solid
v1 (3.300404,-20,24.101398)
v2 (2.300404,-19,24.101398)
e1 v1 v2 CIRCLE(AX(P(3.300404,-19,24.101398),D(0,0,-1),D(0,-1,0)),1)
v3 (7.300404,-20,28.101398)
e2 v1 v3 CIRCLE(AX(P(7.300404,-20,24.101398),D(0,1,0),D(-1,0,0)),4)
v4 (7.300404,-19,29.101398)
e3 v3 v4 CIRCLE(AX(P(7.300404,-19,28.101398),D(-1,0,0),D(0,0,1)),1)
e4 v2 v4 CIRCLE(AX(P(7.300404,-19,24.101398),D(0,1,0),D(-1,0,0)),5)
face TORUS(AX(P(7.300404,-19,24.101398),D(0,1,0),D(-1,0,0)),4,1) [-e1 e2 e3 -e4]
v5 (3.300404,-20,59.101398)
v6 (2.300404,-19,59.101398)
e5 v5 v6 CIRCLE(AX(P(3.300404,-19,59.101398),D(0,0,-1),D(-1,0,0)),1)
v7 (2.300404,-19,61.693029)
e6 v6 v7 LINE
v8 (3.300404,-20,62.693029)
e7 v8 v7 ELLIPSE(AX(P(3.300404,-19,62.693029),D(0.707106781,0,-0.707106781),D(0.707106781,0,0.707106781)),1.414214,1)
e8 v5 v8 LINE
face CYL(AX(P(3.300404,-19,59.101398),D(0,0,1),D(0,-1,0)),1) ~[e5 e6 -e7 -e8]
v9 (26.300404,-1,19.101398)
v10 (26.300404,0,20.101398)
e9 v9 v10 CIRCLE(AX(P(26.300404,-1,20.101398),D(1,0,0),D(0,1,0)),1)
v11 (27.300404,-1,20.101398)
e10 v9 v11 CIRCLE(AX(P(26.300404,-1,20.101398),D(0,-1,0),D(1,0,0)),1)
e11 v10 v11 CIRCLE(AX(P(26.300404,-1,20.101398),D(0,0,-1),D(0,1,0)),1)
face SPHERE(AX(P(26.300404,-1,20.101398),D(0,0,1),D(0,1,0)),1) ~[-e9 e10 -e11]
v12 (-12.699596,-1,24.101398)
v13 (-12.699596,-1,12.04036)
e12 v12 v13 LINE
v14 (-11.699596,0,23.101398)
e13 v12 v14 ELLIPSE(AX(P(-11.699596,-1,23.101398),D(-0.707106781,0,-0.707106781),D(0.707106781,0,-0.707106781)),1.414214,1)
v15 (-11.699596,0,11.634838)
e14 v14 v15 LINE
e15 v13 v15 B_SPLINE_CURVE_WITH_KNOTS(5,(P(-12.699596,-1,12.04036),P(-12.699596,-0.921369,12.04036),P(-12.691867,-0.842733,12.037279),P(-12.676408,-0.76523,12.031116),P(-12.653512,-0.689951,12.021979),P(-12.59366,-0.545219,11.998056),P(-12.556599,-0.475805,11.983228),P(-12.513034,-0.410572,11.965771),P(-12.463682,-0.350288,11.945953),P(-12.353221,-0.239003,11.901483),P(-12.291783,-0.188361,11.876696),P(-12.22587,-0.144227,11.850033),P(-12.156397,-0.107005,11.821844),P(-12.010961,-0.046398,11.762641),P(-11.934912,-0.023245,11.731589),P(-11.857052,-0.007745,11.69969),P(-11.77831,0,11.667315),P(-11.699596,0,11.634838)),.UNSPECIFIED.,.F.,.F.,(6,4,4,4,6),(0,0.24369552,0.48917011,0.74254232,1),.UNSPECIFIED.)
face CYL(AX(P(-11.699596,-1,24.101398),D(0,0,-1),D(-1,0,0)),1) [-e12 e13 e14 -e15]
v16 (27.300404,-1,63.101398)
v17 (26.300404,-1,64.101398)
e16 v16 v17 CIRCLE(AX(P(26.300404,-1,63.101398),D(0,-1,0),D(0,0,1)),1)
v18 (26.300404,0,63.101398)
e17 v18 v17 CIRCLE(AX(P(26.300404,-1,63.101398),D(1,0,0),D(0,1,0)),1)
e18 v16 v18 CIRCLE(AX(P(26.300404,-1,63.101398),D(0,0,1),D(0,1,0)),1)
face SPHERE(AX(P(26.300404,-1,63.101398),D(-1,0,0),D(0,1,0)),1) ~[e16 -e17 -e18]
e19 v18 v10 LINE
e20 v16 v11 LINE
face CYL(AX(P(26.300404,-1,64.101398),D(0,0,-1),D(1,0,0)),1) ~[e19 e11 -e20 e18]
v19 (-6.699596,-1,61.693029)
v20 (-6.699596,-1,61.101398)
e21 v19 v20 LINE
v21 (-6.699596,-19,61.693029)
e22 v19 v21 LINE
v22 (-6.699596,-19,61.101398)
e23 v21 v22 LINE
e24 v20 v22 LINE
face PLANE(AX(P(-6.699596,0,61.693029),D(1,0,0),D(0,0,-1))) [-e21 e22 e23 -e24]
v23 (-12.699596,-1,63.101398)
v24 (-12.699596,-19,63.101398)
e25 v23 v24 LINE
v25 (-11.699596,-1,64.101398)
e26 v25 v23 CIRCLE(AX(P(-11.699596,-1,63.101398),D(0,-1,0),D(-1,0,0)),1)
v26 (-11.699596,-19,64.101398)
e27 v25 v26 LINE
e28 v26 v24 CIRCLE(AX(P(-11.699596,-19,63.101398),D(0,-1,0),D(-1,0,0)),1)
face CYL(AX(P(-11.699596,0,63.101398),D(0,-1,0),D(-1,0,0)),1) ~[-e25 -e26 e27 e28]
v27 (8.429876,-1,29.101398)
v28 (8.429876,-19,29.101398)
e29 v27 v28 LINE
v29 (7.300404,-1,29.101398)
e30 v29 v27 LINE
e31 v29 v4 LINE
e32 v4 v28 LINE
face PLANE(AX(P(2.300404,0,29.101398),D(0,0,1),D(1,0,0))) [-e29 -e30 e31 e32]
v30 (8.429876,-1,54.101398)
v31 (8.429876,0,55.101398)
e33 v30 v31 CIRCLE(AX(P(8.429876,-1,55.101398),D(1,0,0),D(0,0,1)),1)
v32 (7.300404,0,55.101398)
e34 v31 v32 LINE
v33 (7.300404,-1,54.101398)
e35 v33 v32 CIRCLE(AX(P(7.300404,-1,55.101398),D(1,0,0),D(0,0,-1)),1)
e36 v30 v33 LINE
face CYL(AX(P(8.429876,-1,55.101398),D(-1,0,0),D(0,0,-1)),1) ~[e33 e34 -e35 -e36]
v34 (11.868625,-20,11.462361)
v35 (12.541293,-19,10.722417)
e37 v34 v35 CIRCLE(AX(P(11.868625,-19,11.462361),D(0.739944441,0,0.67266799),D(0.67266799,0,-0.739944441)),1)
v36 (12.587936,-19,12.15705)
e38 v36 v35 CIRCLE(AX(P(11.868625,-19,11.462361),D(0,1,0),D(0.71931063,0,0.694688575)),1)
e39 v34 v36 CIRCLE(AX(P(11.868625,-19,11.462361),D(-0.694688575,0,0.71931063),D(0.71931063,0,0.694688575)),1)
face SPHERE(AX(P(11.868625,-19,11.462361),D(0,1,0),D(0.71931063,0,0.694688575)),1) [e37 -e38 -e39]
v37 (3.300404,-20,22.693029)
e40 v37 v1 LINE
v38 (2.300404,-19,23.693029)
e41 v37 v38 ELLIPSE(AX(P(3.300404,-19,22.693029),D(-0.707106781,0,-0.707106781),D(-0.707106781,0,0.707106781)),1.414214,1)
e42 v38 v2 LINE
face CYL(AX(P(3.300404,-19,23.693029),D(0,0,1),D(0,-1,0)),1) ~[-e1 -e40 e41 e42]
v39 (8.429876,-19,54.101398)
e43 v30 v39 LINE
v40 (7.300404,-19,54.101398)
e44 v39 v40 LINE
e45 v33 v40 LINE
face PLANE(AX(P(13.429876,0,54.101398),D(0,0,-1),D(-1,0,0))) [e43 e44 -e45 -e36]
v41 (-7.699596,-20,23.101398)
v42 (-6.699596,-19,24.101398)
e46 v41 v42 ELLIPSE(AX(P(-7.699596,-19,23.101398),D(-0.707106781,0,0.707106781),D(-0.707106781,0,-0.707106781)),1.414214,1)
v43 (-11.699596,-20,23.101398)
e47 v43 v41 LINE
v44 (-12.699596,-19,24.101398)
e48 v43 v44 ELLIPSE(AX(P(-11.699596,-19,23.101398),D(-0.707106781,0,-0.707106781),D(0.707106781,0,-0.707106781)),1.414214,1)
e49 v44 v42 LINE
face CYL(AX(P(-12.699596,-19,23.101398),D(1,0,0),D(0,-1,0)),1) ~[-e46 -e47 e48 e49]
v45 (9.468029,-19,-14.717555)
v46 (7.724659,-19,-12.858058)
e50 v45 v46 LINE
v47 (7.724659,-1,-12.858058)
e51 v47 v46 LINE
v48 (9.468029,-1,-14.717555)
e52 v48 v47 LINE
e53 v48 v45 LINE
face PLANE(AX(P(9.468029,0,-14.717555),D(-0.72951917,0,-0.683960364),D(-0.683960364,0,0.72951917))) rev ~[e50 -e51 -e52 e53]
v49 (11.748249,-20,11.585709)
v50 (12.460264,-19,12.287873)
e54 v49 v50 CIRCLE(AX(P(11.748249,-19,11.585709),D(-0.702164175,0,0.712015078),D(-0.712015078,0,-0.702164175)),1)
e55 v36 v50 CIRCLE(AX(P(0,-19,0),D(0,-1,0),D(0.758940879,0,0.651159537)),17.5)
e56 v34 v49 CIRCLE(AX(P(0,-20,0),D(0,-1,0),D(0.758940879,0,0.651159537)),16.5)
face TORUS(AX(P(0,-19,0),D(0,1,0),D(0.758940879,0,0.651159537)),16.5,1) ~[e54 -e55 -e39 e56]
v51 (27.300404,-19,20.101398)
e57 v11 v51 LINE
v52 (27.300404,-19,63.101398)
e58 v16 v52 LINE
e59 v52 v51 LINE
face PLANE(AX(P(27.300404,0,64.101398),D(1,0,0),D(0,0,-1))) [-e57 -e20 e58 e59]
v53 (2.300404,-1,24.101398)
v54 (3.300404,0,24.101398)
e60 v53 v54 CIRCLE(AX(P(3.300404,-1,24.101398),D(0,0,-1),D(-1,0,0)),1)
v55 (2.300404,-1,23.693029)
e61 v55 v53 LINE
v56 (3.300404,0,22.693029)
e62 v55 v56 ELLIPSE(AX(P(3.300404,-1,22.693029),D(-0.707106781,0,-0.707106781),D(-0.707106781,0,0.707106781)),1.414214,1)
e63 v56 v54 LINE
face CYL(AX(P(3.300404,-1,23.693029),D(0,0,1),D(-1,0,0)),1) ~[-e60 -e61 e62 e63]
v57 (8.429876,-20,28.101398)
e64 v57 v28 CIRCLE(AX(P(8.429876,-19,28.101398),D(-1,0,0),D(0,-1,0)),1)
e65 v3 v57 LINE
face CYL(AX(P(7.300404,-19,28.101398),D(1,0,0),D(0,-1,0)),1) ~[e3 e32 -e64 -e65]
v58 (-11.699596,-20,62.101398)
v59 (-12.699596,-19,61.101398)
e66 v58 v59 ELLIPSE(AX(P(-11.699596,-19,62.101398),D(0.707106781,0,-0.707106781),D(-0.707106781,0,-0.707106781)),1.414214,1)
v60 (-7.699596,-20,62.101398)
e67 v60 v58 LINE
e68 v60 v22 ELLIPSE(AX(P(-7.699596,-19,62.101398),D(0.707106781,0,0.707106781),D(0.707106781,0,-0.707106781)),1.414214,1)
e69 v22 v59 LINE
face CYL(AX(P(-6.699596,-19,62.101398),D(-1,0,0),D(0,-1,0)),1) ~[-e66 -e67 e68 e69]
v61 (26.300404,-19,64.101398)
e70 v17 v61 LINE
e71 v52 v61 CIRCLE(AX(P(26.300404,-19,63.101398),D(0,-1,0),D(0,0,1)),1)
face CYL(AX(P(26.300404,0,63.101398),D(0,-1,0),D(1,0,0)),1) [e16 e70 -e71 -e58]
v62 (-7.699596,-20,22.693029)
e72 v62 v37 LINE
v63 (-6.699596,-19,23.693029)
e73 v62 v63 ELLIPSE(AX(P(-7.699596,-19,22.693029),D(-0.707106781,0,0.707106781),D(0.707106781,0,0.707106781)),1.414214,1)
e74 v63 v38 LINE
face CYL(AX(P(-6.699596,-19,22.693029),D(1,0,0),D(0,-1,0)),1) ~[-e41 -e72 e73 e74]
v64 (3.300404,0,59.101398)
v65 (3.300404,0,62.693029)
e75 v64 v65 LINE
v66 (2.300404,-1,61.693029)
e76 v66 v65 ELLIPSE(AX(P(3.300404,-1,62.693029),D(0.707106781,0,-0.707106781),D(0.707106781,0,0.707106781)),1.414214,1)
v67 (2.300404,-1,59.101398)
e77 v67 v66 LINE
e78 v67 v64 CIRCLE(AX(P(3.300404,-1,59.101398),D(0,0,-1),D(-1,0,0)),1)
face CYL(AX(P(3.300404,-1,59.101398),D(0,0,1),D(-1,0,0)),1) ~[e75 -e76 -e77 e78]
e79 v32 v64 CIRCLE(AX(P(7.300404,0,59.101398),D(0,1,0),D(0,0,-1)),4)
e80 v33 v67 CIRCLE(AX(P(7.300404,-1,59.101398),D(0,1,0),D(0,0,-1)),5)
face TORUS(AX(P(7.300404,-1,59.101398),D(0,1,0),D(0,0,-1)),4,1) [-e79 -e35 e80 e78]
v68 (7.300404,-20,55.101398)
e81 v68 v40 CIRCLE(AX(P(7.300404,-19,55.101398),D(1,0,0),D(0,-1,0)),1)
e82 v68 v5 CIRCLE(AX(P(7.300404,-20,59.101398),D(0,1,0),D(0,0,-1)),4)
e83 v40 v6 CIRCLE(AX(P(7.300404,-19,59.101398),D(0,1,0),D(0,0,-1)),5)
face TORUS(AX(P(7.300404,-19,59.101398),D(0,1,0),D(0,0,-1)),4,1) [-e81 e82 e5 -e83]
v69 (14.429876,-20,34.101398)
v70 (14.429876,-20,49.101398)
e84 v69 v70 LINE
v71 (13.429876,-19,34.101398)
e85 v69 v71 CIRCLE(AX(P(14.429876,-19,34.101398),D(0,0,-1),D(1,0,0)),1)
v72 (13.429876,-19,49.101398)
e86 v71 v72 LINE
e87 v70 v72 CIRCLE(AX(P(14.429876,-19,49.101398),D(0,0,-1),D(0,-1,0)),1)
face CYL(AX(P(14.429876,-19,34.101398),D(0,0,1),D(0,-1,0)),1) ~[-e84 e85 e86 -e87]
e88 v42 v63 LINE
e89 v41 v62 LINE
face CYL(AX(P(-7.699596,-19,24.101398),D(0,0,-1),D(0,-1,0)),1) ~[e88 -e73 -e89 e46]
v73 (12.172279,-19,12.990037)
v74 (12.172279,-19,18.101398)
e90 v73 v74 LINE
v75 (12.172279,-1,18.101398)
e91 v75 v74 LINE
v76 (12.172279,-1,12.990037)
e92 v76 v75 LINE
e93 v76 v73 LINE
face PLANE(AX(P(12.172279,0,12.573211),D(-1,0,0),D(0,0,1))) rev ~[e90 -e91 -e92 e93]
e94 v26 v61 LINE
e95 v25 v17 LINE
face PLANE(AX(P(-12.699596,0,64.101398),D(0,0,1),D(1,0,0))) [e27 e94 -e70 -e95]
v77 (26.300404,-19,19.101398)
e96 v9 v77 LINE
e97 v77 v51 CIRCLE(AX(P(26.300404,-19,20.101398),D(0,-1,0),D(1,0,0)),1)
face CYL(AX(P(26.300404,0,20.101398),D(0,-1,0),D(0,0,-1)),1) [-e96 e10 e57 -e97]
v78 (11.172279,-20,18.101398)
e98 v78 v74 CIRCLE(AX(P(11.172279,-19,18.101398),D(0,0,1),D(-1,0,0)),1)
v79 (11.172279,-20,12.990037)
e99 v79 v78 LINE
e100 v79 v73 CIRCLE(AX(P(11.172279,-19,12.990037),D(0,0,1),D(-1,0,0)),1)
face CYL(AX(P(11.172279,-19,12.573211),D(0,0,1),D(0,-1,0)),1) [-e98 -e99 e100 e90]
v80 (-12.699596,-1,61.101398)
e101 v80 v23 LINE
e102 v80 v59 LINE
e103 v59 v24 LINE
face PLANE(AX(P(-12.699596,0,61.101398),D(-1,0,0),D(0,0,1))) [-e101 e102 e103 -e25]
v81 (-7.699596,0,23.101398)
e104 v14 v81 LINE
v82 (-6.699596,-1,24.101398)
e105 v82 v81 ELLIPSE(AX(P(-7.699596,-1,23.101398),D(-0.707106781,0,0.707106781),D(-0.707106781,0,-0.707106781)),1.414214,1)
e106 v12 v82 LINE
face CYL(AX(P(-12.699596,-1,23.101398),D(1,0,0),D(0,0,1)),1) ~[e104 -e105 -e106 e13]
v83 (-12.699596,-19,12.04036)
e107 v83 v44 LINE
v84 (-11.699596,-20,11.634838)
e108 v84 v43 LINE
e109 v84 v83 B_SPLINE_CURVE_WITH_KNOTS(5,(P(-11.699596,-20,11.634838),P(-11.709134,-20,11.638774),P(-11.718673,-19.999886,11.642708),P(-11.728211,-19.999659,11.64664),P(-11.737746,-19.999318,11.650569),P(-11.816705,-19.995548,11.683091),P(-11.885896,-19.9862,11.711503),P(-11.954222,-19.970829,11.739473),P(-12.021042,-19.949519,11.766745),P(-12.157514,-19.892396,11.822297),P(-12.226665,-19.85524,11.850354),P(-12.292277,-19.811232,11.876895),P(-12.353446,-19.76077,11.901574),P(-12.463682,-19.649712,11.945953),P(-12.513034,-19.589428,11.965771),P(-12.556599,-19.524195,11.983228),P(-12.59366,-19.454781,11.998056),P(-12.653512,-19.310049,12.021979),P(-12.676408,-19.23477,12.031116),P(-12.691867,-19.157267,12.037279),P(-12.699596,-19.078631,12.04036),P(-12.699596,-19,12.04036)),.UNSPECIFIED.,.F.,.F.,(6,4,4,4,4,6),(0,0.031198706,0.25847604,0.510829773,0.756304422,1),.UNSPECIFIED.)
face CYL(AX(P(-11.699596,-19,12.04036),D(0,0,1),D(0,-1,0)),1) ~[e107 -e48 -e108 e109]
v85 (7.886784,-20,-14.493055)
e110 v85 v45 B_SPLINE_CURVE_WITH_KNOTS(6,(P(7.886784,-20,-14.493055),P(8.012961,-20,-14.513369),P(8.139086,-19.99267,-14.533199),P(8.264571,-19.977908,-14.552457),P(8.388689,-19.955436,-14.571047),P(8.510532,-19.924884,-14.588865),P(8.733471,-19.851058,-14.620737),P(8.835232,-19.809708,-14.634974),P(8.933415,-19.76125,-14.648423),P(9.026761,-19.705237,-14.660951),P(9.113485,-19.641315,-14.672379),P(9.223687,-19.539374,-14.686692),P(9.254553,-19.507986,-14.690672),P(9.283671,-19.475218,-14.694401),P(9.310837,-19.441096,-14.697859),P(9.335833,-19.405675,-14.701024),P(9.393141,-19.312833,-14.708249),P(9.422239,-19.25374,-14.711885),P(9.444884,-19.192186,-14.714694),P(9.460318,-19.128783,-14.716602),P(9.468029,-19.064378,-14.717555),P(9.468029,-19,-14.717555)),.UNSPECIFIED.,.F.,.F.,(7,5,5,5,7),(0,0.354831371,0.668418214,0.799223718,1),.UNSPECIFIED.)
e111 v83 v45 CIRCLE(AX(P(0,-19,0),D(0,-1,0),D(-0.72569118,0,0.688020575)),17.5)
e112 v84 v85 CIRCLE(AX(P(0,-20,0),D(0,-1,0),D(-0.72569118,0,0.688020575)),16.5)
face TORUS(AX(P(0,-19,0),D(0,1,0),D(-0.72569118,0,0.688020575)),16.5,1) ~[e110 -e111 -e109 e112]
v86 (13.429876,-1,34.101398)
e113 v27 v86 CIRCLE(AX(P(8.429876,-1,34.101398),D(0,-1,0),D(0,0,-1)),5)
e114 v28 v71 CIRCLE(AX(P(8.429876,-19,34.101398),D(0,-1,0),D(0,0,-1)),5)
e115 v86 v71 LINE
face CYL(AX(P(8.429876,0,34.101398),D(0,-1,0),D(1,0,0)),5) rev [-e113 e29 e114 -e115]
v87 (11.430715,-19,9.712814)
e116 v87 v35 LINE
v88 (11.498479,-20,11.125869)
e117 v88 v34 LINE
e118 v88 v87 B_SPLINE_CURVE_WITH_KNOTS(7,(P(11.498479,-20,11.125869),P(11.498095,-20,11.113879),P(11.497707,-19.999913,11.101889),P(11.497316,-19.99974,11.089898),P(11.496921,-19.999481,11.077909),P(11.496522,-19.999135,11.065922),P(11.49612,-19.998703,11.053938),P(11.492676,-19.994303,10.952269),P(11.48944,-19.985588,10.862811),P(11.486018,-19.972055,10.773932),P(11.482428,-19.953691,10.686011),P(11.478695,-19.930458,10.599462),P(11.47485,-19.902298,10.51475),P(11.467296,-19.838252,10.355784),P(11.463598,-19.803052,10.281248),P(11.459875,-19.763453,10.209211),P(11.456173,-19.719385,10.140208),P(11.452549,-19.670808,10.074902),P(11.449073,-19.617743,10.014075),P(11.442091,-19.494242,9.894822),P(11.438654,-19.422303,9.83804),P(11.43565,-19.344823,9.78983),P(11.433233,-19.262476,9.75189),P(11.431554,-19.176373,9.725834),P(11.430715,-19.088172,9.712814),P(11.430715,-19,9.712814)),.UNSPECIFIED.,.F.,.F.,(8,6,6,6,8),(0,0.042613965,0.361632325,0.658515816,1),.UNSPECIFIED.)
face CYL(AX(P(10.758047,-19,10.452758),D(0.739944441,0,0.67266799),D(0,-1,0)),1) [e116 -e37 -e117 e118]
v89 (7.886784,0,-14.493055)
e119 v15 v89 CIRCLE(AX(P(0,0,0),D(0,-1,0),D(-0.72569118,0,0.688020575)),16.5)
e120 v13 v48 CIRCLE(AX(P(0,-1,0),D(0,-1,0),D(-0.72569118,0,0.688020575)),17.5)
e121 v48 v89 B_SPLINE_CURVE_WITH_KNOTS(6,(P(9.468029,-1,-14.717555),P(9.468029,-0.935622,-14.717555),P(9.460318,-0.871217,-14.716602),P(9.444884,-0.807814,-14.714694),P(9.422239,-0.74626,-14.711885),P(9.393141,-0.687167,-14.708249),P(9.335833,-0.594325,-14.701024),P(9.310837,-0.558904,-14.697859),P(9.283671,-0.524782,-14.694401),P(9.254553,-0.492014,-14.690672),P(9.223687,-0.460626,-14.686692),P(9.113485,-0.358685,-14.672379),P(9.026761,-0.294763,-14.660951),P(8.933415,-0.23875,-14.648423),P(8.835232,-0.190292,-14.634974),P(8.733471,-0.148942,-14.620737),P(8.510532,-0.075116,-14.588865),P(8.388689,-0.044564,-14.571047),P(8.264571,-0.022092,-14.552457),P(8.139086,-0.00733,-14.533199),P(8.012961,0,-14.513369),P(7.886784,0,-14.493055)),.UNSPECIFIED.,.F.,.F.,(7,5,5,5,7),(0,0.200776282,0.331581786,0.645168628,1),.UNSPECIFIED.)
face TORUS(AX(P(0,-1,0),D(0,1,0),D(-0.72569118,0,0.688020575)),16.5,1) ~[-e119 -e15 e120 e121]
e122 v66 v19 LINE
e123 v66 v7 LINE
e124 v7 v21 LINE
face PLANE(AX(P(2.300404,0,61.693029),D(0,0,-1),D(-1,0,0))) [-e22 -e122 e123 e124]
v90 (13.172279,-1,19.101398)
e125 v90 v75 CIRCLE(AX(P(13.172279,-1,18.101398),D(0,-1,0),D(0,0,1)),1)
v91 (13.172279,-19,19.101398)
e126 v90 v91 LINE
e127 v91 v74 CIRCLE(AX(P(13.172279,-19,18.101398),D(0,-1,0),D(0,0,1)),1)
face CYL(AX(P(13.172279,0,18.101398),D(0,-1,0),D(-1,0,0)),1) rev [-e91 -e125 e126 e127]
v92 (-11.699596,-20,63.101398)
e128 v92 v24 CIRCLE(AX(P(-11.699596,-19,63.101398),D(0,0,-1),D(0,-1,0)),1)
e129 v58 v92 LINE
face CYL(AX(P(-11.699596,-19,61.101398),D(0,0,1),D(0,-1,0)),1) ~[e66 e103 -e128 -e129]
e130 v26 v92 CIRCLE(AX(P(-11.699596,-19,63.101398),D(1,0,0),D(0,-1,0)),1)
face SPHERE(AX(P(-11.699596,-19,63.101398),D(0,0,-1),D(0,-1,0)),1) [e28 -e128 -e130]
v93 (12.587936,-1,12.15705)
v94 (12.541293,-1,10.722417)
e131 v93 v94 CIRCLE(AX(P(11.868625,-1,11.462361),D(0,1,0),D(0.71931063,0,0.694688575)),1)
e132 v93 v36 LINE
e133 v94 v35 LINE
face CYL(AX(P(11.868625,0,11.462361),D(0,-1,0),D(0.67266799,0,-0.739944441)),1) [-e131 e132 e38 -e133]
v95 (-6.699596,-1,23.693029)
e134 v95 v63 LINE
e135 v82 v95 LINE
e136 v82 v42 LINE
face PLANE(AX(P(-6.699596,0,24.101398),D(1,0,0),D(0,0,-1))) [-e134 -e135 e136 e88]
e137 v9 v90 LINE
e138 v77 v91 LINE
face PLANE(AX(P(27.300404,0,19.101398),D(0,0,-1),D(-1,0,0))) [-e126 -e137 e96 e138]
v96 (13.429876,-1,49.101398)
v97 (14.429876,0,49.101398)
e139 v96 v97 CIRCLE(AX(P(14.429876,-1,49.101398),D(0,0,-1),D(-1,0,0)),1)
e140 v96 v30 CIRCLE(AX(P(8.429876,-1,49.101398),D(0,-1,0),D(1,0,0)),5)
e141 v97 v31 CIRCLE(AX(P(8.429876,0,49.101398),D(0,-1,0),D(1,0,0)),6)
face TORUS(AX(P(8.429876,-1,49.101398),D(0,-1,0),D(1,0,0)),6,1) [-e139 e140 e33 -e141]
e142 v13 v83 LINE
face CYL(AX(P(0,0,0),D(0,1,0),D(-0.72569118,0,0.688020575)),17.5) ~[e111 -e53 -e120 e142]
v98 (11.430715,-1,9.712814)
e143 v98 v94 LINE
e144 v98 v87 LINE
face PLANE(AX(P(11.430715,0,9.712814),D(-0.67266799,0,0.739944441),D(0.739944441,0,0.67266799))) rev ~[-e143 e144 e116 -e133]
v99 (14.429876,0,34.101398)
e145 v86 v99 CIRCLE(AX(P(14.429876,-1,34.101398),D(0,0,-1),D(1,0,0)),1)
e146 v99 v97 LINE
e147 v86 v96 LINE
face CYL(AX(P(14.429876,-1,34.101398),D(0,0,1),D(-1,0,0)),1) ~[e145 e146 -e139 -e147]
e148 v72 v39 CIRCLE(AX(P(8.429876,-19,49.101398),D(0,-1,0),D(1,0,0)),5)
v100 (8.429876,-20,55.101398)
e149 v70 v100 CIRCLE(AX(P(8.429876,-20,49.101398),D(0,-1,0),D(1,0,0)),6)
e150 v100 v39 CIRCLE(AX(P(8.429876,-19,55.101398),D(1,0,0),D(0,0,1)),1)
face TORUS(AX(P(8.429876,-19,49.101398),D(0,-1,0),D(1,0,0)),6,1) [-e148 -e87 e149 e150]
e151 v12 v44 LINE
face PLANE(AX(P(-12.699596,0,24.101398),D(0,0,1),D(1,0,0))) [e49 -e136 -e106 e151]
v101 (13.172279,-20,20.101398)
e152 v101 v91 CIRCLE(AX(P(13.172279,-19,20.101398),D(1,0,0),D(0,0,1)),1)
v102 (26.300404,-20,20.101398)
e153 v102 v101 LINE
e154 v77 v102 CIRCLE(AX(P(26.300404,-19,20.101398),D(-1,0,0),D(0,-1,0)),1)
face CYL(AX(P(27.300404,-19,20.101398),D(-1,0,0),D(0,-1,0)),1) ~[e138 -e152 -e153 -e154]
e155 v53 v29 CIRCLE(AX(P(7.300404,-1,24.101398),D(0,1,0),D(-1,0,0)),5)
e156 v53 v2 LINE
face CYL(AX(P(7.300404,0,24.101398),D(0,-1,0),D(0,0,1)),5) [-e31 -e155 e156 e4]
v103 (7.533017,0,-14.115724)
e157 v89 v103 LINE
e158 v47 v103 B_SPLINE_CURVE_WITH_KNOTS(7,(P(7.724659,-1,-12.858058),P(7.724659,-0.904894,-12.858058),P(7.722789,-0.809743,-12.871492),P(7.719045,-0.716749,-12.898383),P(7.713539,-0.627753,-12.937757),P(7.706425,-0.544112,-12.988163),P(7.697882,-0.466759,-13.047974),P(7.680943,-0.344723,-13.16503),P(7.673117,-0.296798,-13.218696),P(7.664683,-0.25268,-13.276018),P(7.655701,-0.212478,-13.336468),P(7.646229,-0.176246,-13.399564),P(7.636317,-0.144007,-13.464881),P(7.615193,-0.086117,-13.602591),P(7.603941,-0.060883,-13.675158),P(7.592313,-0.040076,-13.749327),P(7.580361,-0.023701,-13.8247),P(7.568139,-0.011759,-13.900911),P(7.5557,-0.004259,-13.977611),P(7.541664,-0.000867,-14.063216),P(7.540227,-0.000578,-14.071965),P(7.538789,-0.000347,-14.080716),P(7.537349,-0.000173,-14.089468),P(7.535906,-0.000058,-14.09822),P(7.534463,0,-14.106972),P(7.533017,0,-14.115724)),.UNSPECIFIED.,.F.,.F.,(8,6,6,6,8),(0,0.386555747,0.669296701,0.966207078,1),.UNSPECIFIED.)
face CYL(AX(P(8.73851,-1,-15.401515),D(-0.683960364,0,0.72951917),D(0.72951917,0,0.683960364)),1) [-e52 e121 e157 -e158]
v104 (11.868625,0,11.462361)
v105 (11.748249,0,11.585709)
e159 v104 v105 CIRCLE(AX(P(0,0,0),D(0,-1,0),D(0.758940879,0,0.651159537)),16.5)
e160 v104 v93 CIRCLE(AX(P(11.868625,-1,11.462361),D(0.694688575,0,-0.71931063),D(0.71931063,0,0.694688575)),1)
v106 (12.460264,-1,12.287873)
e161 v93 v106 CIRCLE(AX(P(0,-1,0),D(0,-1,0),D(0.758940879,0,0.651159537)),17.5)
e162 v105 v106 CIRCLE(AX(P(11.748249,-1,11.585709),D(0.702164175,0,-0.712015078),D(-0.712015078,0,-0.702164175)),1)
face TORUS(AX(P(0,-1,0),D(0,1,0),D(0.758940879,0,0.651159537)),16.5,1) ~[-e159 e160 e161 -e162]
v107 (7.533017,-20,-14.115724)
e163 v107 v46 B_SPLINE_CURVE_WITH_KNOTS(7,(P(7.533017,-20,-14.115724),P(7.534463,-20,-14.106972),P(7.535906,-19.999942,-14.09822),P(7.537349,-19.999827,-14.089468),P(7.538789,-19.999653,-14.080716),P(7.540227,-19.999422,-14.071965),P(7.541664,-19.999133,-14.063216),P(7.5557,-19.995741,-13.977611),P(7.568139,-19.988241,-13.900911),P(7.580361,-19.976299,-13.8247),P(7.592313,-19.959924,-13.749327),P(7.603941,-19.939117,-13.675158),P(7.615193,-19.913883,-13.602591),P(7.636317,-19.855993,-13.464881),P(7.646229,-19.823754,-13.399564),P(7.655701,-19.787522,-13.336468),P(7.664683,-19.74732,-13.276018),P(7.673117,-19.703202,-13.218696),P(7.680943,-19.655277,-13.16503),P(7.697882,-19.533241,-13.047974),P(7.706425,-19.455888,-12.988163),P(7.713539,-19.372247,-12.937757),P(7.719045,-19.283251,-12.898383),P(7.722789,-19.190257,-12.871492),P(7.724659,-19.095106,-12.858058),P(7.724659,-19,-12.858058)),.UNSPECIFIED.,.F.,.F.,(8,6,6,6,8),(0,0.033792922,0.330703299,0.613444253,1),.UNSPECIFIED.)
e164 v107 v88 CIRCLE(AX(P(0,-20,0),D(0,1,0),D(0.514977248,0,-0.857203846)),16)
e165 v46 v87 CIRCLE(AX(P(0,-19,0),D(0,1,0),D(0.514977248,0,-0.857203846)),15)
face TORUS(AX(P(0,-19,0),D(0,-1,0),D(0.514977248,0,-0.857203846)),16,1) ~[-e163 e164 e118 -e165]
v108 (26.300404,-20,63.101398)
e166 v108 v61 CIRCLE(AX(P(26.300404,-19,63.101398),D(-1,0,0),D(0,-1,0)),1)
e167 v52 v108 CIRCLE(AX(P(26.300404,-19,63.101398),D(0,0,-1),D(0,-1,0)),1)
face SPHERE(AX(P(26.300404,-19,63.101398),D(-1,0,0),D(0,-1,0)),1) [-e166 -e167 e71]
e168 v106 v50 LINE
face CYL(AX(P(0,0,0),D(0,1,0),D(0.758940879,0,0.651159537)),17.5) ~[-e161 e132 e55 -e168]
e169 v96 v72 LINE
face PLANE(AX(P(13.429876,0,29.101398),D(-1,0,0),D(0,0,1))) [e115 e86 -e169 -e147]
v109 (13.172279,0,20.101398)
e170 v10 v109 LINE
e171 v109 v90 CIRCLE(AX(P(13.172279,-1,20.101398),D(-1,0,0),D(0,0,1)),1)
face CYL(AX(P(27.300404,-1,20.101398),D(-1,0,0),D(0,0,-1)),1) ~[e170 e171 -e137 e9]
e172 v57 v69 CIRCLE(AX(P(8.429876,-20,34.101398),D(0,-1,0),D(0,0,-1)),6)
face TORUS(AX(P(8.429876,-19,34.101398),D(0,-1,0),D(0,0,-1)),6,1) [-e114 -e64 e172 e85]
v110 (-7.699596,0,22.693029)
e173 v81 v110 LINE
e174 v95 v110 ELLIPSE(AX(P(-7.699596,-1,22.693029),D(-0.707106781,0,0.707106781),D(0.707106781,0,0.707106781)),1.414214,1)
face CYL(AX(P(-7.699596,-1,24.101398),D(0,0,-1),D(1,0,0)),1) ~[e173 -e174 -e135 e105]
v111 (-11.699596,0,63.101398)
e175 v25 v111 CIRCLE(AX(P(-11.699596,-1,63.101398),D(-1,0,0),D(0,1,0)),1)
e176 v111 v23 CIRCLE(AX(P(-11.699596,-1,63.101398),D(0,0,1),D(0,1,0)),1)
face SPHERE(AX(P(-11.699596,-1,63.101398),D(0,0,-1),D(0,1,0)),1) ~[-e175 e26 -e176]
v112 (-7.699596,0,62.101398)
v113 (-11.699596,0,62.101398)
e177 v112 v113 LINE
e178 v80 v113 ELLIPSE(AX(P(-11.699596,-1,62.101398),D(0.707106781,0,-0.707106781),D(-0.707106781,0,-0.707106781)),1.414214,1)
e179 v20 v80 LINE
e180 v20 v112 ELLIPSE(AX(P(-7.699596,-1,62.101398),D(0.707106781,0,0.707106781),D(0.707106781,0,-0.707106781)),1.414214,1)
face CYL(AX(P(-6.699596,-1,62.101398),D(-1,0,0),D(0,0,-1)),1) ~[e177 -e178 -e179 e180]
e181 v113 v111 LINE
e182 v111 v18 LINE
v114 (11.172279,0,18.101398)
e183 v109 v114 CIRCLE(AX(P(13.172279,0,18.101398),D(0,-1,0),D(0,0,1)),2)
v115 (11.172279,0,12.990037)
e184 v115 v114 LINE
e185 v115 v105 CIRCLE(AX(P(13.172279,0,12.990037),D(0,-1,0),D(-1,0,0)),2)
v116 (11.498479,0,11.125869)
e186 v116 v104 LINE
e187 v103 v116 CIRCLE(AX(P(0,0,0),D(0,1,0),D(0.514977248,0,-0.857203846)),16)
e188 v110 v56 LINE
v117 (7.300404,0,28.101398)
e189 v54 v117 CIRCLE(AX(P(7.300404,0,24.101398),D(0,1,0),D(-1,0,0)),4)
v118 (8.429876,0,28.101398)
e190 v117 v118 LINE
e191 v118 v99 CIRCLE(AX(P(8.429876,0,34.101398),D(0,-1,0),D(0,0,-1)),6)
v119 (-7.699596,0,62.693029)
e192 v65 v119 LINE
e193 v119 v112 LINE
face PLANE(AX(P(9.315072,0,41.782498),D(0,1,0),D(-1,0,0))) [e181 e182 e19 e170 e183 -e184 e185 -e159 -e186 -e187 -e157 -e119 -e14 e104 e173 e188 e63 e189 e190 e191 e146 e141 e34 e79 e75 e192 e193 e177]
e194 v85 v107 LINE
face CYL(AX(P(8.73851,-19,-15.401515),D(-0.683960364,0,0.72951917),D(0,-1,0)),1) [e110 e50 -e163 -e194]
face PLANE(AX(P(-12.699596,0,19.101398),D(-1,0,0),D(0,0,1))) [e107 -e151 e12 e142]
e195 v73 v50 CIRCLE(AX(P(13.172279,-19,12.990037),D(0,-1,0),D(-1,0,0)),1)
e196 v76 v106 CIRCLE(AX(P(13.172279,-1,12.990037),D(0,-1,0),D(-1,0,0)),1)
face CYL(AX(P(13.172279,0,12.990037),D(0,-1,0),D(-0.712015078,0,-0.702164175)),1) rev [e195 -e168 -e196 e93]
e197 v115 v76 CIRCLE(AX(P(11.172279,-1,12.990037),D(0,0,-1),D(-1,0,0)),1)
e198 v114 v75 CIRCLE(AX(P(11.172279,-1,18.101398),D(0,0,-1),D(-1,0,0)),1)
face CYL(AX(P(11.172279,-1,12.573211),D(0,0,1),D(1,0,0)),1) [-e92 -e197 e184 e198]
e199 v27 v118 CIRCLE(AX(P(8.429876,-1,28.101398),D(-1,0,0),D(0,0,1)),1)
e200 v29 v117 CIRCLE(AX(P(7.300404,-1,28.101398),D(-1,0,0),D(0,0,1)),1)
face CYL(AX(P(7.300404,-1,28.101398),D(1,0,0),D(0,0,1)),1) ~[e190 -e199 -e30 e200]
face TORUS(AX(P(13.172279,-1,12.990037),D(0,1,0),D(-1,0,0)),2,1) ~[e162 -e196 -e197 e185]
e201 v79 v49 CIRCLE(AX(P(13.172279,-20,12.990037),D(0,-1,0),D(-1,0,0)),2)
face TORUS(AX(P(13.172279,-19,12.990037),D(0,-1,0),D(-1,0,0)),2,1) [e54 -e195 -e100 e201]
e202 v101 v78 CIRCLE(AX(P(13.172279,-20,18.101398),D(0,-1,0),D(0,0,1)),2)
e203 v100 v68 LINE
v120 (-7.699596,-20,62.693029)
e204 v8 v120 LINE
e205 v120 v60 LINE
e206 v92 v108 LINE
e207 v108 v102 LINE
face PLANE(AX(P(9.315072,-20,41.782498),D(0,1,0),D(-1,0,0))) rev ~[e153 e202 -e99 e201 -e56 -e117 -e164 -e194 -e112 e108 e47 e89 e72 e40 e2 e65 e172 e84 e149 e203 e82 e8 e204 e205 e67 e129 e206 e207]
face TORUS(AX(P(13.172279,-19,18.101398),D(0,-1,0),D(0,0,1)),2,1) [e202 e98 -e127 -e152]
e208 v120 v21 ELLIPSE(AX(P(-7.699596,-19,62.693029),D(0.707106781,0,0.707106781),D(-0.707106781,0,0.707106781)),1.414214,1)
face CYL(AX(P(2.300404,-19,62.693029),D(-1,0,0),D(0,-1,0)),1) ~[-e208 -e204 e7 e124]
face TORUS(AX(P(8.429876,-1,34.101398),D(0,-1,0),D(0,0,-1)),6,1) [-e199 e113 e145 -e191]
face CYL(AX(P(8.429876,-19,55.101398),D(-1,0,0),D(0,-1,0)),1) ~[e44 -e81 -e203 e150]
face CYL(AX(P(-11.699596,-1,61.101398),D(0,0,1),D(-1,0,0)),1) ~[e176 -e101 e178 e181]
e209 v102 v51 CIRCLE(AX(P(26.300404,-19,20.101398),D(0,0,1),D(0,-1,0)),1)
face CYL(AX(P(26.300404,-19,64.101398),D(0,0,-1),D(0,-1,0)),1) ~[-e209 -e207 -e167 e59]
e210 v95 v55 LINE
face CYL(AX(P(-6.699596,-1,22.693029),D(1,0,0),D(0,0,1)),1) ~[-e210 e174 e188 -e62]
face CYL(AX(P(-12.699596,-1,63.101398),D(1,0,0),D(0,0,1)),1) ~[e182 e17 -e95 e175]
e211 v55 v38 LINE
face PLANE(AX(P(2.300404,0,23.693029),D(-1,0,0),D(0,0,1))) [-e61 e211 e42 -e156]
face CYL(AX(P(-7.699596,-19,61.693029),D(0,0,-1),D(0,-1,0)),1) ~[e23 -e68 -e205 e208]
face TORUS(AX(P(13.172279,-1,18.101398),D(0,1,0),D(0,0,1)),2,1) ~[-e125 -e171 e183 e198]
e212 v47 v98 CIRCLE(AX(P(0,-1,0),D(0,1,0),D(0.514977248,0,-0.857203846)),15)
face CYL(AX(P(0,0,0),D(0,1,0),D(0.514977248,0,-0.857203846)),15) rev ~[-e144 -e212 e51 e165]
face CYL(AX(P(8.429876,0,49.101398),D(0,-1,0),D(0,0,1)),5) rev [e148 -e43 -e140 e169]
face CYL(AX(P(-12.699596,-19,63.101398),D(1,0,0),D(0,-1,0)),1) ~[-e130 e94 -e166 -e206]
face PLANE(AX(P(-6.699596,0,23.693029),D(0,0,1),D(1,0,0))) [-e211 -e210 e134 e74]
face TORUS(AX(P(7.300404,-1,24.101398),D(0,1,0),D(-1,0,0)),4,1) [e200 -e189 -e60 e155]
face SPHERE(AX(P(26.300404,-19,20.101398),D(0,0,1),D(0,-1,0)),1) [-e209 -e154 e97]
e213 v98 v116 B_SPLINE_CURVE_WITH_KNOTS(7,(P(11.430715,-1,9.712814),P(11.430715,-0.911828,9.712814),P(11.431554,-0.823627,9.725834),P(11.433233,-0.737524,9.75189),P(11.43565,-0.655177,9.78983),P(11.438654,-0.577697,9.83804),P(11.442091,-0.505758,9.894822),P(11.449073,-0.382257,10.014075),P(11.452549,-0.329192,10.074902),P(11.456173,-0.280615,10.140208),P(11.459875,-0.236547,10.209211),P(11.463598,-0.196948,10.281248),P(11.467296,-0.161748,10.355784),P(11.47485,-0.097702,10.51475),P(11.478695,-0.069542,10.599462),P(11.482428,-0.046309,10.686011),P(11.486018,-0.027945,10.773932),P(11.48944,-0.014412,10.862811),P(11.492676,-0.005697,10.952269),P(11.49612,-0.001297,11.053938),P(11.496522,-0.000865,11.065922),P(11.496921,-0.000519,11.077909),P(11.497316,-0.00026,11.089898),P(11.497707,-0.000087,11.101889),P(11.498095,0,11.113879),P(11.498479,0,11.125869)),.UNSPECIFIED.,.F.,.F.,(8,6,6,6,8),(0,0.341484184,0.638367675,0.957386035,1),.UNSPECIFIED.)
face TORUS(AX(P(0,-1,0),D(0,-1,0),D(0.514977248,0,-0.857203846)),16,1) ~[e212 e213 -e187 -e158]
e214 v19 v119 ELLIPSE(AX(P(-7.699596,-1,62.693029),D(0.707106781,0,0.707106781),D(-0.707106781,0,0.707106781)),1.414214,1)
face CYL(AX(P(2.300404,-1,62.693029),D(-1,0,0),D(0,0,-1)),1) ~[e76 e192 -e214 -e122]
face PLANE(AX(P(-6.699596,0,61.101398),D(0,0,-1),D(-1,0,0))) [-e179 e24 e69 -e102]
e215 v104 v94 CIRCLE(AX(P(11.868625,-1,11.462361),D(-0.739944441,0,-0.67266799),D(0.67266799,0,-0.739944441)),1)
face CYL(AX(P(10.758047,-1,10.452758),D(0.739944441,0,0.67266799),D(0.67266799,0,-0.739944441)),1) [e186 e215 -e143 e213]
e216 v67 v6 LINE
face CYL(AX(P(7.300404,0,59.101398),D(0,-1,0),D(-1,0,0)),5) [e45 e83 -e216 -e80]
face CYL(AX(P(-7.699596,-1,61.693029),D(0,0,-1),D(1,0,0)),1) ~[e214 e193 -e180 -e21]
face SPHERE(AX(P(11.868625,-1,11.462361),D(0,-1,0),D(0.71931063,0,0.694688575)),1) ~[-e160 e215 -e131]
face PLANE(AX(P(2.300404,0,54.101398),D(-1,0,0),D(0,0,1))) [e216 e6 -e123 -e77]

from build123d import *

# Parameters (mm, degrees)
F1_DEPTH = 20
F3_DEPTH = 20
F4_R     = 5
F5_R     = 1


# Not quite as in the source:
# - a feature names something its author has since deleted; it is built from what else it names


with BuildPart() as f1:
    # F0 (on Front) → F1 (new body)
    with BuildSketch(Plane.XZ):
        with BuildLine():
            ThreePointArc((7.7246587161, -12.8580576962), (-14.8017953762, 2.4304019506), (11.4307152083, 9.7128136926))
            Line((11.4307152083, 9.7128136926), (13.2814653766, 11.3952918984))
            ThreePointArc((13.2814653766, 11.3952918984), (12.7404924616, 11.9970768038), (12.1722789481, 12.5732106166))
            Line((12.1722789481, 12.5732106166), (12.1722789481, 17.5))
            Line((12.1722789481, 17.5), (12.1722789481, 19.1013980657))
            Line((12.1722789481, 19.1013980657), (-12.6995956525, 19.1013980657))
            Line((-12.6995956525, 19.1013980657), (-12.6995956525, 17.5))
            Line((-12.6995956525, 17.5), (-12.6995956525, 12.0403600554))
            ThreePointArc((-12.6995956525, 12.0403600554), (-13.4761736825, -11.1643514311), (9.4680293839, -14.71755481))
            Line((9.4680293839, -14.71755481), (7.7246587161, -12.8580576962))
        make_face()
    extrude(amount=F1_DEPTH)

    # F2 (on face) → F3 (join)
    with BuildSketch(Plane(origin=(0, 0, 0), x_dir=(-1, 0, 0), z_dir=(0, 1, 0))):
        Polygon((-12.1722789481, 19.1013980657), (12.6995956525, 19.1013980657), (12.6995956525, 24.1013980657), (6.6995956525, 24.1013980657), (6.6995956525, 23.6930285978), (-2.3004043475, 23.6930285978), (-2.3004043475, 29.1013980657), (-13.4298764169, 29.1013980657), (-13.4298764169, 54.1013980657), (-2.3004043475, 54.1013980657), (-2.3004043475, 61.6930285978), (6.6995956525, 61.6930285978), (6.6995956525, 61.1013980657), (12.6995956525, 61.1013980657), (12.6995956525, 64.1013980657), (-27.3004043475, 64.1013980657), (-27.3004043475, 19.1013980657), align=None)
    extrude(amount=-F3_DEPTH)

    # F4
    f4_edges = [f1.edges().sort_by_distance(p)[0] for p in [
        (2.300404, -10, 54.101398),
        (2.300404, -10, 29.101398),
        (13.429876, -10, 54.101398),
        (13.429876, -10, 29.101398),
    ]]
    fillet(f4_edges, radius=F4_R)

    # F5
    f5_edges = [f1.edges().sort_by_distance(p)[0] for p in [
        (2.300404, 0, 60.397213),
        (3.76487, 0, 55.565864),
        (-2.199596, 0, 61.693029),
        (7.86514, 0, 54.101398),
        (-6.699596, 0, 61.397213),
        (11.96541, 0, 52.636932),
        (-9.699596, 0, 61.101398),
        (13.429876, 0, 41.601398),
        (-12.699596, 0, 62.601398),
        (11.96541, 0, 30.565864),
        (7.300404, 0, 64.101398),
        (7.86514, 0, 29.101398),
        (27.300404, 0, 41.601398),
        (3.76487, 0, 27.636932),
        (19.736342, 0, 19.101398),
        (2.300404, 0, 23.897213),
        (12.172279, 0, 15.837304),
        (-2.199596, 0, 23.693029),
        (12.740492, 0, 11.997077),
        (-6.699596, 0, 23.897213),
        (12.35609, 0, 10.554053),
        (-9.699596, 0, 24.101398),
        (-14.801795, 0, 2.430402),
        (-12.699596, 0, 18.070879),
        (8.596344, 0, -13.787806),
        (-13.476174, 0, -11.164351),
        (2.300404, -20, 60.397213),
        (3.76487, -20, 55.565864),
        (-2.199596, -20, 61.693029),
        (7.86514, -20, 54.101398),
        (-6.699596, -20, 61.397213),
        (11.96541, -20, 52.636932),
        (-9.699596, -20, 61.101398),
        (13.429876, -20, 41.601398),
        (-12.699596, -20, 62.601398),
        (11.96541, -20, 30.565864),
        (7.300404, -20, 64.101398),
        (7.86514, -20, 29.101398),
        (27.300404, -20, 41.601398),
        (3.76487, -20, 27.636932),
        (19.736342, -20, 19.101398),
        (2.300404, -20, 23.897213),
        (12.172279, -20, 15.837304),
        (-2.199596, -20, 23.693029),
        (12.740492, -20, 11.997077),
        (-6.699596, -20, 23.897213),
        (12.35609, -20, 10.554053),
        (-9.699596, -20, 24.101398),
        (-14.801795, -20, 2.430402),
        (-12.699596, -20, 18.070879),
        (8.596344, -20, -13.787806),
        (-13.476174, -20, -11.164351),
        (-12.699596, -10, 64.101398),
        (27.300404, -10, 64.101398),
        (27.300404, -10, 19.101398),
        (12.172279, -10, 19.101398),
        (12.172279, -10, 12.573211),
        (13.281465, -10, 11.395292),
    ]]
    fillet(f5_edges, radius=F5_R)


solid = f1.part
